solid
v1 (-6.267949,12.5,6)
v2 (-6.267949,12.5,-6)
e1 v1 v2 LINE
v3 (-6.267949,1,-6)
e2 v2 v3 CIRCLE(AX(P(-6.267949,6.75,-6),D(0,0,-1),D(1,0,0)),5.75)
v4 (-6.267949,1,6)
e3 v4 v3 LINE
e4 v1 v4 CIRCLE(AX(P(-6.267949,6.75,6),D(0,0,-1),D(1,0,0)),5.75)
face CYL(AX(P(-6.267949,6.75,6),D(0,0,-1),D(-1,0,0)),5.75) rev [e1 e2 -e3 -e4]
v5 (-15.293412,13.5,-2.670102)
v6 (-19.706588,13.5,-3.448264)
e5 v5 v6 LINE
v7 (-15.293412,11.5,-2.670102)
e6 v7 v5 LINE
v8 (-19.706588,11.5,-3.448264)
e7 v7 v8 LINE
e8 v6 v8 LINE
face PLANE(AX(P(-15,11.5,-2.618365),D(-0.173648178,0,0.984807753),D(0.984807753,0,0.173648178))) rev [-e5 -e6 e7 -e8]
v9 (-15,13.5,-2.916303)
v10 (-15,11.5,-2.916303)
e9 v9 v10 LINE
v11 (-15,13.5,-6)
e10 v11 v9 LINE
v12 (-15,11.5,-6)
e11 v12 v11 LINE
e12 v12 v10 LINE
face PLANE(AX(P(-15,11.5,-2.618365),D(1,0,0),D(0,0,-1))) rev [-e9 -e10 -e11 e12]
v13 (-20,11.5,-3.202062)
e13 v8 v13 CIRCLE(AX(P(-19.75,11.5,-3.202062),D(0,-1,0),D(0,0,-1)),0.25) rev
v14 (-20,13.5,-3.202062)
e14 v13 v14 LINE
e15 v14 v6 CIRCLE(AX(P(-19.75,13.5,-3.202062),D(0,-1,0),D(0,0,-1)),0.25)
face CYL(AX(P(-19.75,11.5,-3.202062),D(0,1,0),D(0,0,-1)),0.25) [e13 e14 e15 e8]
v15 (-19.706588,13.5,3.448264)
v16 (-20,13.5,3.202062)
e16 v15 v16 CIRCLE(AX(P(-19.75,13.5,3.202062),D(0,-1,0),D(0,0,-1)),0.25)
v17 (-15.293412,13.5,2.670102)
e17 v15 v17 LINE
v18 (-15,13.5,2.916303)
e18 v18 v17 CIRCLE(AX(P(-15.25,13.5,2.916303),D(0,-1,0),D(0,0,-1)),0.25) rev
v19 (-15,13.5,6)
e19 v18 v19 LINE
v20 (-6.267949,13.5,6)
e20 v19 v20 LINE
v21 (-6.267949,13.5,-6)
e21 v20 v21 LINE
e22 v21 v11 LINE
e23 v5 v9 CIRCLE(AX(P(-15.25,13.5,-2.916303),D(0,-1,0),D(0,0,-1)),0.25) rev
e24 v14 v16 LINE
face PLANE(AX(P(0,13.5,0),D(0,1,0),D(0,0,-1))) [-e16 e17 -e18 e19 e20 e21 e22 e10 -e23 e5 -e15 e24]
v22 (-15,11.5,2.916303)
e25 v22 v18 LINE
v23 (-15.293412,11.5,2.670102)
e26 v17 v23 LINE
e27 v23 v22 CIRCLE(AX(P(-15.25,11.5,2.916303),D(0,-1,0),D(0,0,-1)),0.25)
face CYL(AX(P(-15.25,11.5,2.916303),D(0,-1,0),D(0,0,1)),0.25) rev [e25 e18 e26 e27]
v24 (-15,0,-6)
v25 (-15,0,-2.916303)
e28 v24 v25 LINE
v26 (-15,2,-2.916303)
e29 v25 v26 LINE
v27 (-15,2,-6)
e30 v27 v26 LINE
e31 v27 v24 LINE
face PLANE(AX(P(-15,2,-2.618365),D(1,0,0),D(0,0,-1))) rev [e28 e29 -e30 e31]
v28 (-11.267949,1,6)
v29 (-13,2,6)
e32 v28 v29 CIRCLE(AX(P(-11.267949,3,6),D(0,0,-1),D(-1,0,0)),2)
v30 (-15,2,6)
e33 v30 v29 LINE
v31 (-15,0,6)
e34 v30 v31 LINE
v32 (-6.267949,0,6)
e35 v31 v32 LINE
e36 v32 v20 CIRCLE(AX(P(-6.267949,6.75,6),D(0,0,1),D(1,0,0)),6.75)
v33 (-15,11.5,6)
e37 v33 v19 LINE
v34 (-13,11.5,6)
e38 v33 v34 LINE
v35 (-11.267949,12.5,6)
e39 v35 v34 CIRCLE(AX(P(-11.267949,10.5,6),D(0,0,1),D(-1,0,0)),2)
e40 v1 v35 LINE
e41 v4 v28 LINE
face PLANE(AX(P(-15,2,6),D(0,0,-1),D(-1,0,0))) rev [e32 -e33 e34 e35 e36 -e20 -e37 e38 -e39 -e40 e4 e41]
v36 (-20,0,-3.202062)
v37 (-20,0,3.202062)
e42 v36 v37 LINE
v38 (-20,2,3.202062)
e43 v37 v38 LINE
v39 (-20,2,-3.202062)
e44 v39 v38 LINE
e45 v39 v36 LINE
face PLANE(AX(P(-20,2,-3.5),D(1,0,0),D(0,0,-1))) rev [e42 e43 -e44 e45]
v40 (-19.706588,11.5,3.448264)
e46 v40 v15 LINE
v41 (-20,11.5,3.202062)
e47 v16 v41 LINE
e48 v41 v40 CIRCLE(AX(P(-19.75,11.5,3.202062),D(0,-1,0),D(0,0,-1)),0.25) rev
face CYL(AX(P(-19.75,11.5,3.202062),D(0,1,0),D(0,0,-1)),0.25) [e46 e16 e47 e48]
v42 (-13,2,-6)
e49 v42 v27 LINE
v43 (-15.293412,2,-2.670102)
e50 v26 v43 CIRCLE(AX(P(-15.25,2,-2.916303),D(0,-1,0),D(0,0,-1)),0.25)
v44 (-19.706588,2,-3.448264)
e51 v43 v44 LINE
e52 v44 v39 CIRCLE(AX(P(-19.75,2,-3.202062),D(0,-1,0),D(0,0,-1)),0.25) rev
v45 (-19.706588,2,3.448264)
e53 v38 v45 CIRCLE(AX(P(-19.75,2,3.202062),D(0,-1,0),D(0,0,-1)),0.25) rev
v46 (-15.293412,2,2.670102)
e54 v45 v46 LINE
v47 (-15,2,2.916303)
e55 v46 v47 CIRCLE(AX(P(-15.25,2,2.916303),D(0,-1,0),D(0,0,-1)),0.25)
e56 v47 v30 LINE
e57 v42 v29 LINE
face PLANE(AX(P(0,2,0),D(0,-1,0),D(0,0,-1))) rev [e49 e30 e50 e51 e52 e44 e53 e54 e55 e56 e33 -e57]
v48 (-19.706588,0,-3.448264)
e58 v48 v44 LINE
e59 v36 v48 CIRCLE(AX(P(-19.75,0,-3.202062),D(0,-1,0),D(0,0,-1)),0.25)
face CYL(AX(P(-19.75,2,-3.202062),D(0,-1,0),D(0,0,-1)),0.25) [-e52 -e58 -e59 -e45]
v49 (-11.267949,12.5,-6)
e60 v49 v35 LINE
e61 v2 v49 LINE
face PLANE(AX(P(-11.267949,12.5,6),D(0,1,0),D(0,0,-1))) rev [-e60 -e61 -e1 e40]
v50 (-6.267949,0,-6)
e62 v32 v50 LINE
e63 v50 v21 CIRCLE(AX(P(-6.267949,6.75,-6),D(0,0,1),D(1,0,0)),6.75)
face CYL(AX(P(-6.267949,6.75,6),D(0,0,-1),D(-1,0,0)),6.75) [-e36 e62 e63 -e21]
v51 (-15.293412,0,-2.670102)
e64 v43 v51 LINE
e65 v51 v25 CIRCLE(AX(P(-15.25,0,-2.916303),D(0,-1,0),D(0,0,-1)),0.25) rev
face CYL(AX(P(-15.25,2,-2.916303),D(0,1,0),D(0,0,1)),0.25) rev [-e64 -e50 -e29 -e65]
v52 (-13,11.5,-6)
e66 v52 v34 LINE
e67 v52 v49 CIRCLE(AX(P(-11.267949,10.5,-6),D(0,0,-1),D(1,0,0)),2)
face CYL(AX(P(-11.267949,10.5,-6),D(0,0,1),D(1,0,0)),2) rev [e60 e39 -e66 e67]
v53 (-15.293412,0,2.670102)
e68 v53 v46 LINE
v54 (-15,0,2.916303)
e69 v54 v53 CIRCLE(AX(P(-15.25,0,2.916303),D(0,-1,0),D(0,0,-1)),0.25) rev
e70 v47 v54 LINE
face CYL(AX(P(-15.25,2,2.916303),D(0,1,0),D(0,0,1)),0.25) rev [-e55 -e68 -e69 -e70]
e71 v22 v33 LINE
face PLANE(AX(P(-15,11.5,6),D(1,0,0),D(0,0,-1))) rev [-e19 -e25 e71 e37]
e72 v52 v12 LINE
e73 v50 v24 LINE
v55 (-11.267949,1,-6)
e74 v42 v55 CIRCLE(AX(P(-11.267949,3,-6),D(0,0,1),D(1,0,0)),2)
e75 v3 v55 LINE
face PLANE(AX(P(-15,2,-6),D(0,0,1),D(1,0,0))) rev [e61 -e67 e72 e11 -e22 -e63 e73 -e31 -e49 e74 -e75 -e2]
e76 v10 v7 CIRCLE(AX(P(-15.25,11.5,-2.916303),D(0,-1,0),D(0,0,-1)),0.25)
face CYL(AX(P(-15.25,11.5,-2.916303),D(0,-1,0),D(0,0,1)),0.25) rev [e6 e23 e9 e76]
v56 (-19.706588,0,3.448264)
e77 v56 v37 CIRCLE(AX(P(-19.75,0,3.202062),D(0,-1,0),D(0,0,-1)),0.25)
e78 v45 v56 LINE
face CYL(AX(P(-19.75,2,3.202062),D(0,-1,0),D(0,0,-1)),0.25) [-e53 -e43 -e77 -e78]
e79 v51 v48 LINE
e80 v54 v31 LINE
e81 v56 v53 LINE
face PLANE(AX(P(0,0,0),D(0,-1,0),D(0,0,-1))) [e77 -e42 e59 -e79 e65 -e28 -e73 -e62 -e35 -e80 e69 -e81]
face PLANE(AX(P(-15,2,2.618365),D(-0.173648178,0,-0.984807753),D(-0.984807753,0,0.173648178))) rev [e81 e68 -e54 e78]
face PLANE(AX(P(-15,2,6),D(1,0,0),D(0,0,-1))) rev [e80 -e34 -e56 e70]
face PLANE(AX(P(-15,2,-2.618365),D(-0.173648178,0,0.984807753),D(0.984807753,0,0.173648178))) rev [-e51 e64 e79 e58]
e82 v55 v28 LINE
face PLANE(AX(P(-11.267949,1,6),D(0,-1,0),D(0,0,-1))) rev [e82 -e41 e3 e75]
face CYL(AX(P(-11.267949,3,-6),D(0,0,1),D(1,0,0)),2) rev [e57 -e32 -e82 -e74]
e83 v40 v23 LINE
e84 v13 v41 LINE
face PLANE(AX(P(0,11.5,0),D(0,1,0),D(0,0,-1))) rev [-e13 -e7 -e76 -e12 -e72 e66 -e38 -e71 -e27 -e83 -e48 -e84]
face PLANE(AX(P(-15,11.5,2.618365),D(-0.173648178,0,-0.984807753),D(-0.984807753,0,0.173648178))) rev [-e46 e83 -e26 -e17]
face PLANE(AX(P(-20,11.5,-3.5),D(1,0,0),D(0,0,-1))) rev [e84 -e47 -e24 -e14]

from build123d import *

# Parameters (mm, degrees)
BOSS_EXTRUDE1_DEPTH = 2
FILLET1_R           = 0.25
SKETCH3_W           = 26
SKETCH3_H           = 12
CUT_EXTRUDE2_DEPTH  = 1
FILLET6_R           = 2
SKETCH4_W           = 36.903708965
SKETCH4_H           = 12
CUT_EXTRUDE3_DEPTH  = 5
BOSS_EXTRUDE2_DEPTH = 6


with BuildPart() as part:
    # Sketch1 → Boss-Extrude1 (new body)
    with BuildSketch(Plane(origin=(0, 0, 0), x_dir=(1, 0, 0), z_dir=(0, 1, 0))):
        Polygon((-15, 2.618365096), (-20, 3.5), (-20, -3.5), (-15, -2.618365096), (-15, -6), (15, -6), (15, -2.618365096), (20, -3.5), (20, 3.5), (15, 2.618365096), (15, 6), (-15, 6), align=None)
    extrude(amount=BOSS_EXTRUDE1_DEPTH)

    # Fillet1
    fillet1_edges = [part.edges().sort_by_distance(p)[0] for p in [
        (15, 1, -2.618365096),
        (20, 1, -3.5),
        (20, 1, 3.5),
        (15, 1, 2.618365096),
        (-15, 1, 2.618365096),
        (-20, 1, 3.5),
        (-20, 1, -3.5),
        (-15, 1, -2.618365096),
    ]]
    fillet(fillet1_edges, radius=FILLET1_R)

    # Sketch3 → Cut-Extrude2 (cut)
    with BuildSketch(Plane(origin=(0, 2, 0), x_dir=(1, 0, 0), z_dir=(0, 1, 0))):
        Rectangle(SKETCH3_W, SKETCH3_H)
    extrude(amount=-CUT_EXTRUDE2_DEPTH, mode=Mode.SUBTRACT)

    # Fillet6
    # the kernel refuses this fillet: 2 mm, written as the material it adds along each edge
    with BuildSketch(Plane(origin=(-13, 1, 6), x_dir=(0, 1, 0), z_dir=(0, 0, -1))) as fillet6_piece_1:
        with BuildLine():
            CenterArc((2, 1.732050808), FILLET6_R, 180, 60)
            Line((0, 1.732050808), (-0.04, 1.732050808))
            Line((-0.04, 1.732050808), (-0.04, 0))
            Line((-0.04, 0), (0, -0.04))
            ThreePointArc((0, -0.04), (0.5, -0.04), (0.98, -0.034641016))
            Line((0.98, -0.034641016), (1, 0))
        make_face()
    extrude(amount=12)
    with BuildSketch(Plane(origin=(13, 1, -6), x_dir=(-1, 0, 0), z_dir=(0, 0, 1))) as fillet6_piece_2:
        with BuildLine():
            CenterArc((1.732050808, -2), FILLET6_R, 90, 60)
            Line((0, -1), (-0.034641016, -0.98))
            ThreePointArc((-0.034641016, -0.98), (-0.04, -0.5), (-0.04, 0))
            Line((-0.04, 0), (0, 0.04))
            Line((0, 0.04), (1.732050808, 0.04))
            Line((1.732050808, 0.04), (1.732050808, 0))
        make_face()
    extrude(amount=12)

    # Sketch4 → Cut-Extrude3 (cut, symmetric)
    with BuildSketch(Plane(origin=(0, 1, 0), x_dir=(1, 0, 0), z_dir=(0, 1, 0))):
        with Locations((7.18390529, 0)):
            Rectangle(SKETCH4_W, SKETCH4_H)
    extrude(amount=CUT_EXTRUDE3_DEPTH, both=True, mode=Mode.SUBTRACT)

    # Sketch6 → Boss-Extrude2 (add, symmetric)
    with BuildSketch(Plane.XY):
        with BuildLine():
            Line((-11.267949192, 0), (-11.267949192, 1))
            Line((-11.267949192, 1), (-6.267949192, 1))
            ThreePointArc((-6.267949192, 1), (-2.202085201, 2.684136008), (-0.517949192, 6.75))
            Line((-0.517949192, 6.75), (0.482050808, 6.75))
            ThreePointArc((0.482050808, 6.75), (-1.494978419, 1.977029227), (-6.267949192, 0))
            Line((-6.267949192, 0), (-11.267949192, 0))
        make_face()
    extrude(amount=BOSS_EXTRUDE2_DEPTH, both=True)

    # Mirror3: part across plane


with BuildPart() as part_1:
    add(part.part)
    add(part.part.mirror(Plane.ZX.offset(6.75)))


solid = part_1.part
